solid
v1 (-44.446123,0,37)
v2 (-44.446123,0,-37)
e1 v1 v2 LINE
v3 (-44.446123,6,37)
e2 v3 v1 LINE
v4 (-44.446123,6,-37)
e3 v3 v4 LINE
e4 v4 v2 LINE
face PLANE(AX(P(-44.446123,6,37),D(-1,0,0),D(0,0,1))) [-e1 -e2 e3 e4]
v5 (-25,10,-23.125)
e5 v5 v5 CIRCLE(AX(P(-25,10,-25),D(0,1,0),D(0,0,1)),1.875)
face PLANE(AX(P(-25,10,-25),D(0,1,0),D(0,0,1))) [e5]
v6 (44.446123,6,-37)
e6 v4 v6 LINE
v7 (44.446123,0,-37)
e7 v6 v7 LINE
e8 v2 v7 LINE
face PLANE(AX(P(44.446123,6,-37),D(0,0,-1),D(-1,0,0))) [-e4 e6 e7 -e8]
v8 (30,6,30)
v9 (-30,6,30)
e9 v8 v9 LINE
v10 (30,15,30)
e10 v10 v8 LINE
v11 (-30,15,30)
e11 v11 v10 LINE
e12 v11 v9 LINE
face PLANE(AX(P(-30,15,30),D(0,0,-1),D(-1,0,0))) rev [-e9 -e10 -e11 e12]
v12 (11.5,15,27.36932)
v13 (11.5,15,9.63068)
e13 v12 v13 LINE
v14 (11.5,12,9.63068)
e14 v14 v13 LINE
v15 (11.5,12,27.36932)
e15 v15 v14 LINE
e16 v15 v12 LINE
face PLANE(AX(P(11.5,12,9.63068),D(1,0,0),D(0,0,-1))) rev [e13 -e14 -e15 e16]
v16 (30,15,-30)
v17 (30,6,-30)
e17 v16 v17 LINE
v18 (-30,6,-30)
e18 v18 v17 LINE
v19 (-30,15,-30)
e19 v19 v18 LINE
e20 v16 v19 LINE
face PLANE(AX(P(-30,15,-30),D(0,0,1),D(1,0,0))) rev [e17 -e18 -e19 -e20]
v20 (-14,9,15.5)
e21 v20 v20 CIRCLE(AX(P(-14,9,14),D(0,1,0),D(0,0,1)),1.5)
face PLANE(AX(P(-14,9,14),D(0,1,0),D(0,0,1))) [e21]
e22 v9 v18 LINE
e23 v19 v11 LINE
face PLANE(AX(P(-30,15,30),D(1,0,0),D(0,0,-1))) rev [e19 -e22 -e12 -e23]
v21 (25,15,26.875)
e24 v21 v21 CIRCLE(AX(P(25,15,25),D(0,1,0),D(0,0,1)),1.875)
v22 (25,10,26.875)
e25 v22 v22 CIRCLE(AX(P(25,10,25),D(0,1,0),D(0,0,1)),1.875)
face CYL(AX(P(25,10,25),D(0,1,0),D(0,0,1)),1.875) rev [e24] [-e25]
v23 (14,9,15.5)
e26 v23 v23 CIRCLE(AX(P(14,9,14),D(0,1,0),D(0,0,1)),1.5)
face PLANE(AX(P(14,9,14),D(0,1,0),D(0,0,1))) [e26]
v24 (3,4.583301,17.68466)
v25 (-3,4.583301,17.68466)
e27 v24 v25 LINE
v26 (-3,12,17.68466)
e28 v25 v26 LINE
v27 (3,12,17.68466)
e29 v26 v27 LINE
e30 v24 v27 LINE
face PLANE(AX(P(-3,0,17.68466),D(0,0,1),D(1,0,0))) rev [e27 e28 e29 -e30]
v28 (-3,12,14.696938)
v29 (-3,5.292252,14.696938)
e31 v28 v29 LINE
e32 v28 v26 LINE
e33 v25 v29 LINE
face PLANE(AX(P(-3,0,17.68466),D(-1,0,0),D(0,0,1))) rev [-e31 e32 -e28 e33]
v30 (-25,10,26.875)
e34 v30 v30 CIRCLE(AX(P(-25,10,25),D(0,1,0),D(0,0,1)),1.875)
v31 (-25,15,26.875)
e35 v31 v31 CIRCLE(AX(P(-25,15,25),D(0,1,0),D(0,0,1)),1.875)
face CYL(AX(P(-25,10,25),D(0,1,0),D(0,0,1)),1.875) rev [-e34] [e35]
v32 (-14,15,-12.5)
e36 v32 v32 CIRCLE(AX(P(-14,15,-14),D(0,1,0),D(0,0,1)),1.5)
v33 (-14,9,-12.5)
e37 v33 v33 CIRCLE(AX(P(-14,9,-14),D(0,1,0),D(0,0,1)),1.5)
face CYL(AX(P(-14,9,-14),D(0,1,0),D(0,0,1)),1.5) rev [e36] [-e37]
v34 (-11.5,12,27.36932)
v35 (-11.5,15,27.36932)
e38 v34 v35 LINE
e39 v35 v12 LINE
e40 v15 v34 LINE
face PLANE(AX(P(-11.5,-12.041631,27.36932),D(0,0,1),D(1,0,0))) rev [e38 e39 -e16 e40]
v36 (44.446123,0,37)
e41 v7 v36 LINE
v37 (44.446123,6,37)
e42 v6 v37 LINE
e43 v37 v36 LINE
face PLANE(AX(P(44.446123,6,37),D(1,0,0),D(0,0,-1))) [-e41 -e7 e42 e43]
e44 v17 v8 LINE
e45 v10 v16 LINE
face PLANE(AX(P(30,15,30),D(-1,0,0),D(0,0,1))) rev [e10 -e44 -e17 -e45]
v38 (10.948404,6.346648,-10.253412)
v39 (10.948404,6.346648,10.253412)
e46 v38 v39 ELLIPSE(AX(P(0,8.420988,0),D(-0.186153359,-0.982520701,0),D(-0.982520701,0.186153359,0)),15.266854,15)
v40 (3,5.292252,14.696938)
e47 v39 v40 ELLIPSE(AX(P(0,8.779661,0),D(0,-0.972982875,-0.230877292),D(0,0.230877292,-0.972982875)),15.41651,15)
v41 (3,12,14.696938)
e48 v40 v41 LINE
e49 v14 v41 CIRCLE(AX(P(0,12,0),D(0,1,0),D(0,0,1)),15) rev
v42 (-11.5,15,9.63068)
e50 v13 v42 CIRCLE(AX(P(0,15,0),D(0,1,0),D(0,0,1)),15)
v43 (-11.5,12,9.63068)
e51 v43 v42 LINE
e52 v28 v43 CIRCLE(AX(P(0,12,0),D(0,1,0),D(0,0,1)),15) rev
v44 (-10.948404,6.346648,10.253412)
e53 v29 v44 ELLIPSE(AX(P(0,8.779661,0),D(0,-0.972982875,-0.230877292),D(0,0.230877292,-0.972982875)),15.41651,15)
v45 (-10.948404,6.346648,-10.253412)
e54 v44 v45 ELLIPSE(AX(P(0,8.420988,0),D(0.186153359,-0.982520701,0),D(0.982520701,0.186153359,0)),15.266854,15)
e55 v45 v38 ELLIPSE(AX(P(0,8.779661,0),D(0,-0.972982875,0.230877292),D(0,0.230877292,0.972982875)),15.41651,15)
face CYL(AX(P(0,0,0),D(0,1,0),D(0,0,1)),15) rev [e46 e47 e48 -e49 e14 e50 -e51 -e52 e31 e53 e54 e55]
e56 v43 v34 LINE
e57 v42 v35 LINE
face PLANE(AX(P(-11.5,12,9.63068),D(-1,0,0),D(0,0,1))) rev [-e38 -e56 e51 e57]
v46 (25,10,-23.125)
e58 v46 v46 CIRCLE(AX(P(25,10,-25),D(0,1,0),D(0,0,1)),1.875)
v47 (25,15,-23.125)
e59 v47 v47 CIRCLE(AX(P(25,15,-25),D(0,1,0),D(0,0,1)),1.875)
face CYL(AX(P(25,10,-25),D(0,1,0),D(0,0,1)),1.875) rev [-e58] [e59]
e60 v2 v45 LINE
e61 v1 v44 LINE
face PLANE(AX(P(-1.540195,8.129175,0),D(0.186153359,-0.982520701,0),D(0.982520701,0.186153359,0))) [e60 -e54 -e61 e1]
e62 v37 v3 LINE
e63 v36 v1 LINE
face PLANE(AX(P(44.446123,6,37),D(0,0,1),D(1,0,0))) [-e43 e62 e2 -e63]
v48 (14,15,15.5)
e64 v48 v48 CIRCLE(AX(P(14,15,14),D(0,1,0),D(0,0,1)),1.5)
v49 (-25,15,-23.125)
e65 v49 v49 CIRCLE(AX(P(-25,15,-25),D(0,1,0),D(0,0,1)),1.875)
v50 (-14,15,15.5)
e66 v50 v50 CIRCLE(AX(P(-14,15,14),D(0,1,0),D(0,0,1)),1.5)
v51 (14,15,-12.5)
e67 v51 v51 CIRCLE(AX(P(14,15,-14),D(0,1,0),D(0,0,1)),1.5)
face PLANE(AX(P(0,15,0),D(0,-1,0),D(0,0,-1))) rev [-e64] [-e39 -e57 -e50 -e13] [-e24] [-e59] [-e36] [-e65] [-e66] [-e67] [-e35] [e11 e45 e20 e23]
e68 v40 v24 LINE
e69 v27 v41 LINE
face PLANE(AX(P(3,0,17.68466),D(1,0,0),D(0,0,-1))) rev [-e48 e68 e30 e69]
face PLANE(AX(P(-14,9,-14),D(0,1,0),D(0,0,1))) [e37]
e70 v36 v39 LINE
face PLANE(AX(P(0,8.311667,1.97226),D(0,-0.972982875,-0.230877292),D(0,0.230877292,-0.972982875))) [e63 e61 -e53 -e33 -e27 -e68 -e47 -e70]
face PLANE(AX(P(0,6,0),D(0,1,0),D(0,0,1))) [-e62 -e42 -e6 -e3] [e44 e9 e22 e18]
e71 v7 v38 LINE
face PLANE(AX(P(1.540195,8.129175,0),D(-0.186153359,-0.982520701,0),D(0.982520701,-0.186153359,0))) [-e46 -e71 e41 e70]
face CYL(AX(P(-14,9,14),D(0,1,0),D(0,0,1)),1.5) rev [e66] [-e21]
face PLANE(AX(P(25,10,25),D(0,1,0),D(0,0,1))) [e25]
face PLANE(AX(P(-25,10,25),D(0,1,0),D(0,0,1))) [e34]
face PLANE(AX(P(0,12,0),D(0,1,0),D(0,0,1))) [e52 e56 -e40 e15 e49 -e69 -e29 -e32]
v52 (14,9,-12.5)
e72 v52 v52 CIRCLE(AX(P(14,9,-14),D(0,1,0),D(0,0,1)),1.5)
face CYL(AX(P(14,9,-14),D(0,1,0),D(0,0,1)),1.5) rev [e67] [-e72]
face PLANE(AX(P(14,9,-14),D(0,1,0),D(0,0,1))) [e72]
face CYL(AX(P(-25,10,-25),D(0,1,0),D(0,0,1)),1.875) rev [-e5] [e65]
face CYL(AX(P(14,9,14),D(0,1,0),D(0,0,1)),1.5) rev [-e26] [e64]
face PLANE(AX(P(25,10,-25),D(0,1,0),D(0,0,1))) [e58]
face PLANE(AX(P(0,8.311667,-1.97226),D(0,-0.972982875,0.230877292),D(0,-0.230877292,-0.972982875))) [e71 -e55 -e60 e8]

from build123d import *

# Parameters (mm, degrees)
SKETCH1_W           = 60
SKETCH1_H           = 60
BOSS_EXTRUDE1_DEPTH = 15
SKETCH10_W          = 15
SKETCH10_H          = 15
CUT_EXTRUDE4_DEPTH  = 8
SKETCH9_W           = 88.892246252
SKETCH9_H           = 74
SKETCH9_W_2         = 60
SKETCH9_H_2         = 60
BOSS_EXTRUDE4_DEPTH = 6
SKETCH2_R           = 15
CUT_EXTRUDE5_DEPTH  = 60.744940206
SKETCH11_R          = 1.5
CUT_EXTRUDE6_DEPTH  = 6
SKETCH12_W          = 23
SKETCH12_H          = 10.738639716
CUT_EXTRUDE7_DEPTH  = 3
SKETCH13_W          = 23
SKETCH13_H          = 7
CUT_EXTRUDE8_DEPTH  = 3
SKETCH14_R          = 1.875
CUT_EXTRUDE9_DEPTH  = 5
SKETCH15_W          = 6
SKETCH15_H          = 8
CUT_EXTRUDE10_DEPTH = 60.063168554


with BuildPart() as part:
    # Sketch1 → Boss-Extrude1 (new body)
    with BuildSketch(Plane(origin=(0, 0, 0), x_dir=(1, 0, 0), z_dir=(0, 1, 0))):
        Rectangle(SKETCH1_W, SKETCH1_H)
    extrude(amount=BOSS_EXTRUDE1_DEPTH)

    # Sketch10 → Cut-Extrude4 (cut)
    with BuildSketch(Plane(origin=(0, 15, 0), x_dir=(1, 0, 0), z_dir=(0, 1, 0))):
        Rectangle(SKETCH10_W, SKETCH10_H)
    extrude(amount=-CUT_EXTRUDE4_DEPTH, mode=Mode.SUBTRACT)

    # Sketch9 → Boss-Extrude4 (add)
    with BuildSketch(Plane.XZ):
        Rectangle(SKETCH9_W, SKETCH9_H)
        Rectangle(SKETCH9_W_2, SKETCH9_H_2, mode=Mode.SUBTRACT)
    extrude(amount=-BOSS_EXTRUDE4_DEPTH)

    # Cut-Loft2: read off the stored shape, not the designer's step
    # Cut-Loft2: loft between two sections, ruled curve by curve
    cut_loft2_from = [
        Edge.make_line((-7.5, 7, -7.5), (7.5, 7, -7.5)),
        Edge.make_line((7.5, 7, -7.5), (7.5, 7, 7.5)),
        Edge.make_line((-7.5, 7, 7.5), (-7.5, 7, -7.5)),
        Edge.make_line((7.5, 7, 7.5), (-7.5, 7, 7.5)),
    ]
    cut_loft2_to = [
        Edge.make_line((-44.446123126, 0, -37), (44.446123126, 0, -37)),
        Edge.make_line((44.446123126, 0, -37), (44.446123126, 0, 37)),
        Edge.make_line((-44.446123126, 0, 37), (-44.446123126, 0, -37)),
        Edge.make_line((44.446123126, 0, 37), (-44.446123126, 0, 37)),
    ]
    cut_loft2 = Solid(Shell([*[Face.make_surface_from_curves(cut_loft2_from[k], cut_loft2_to[k]) for k in range(4)], Face(Wire(cut_loft2_from)), Face(Wire(cut_loft2_to))]))
    add(cut_loft2, mode=Mode.SUBTRACT)

    # Sketch2 → Cut-Extrude5 (cut, through all)
    with BuildSketch(Plane(origin=(0, 15, 0), x_dir=(1, 0, 0), z_dir=(0, 1, 0))):
        with Locations(Location((0, 0, 0), (0, 0, 270))):
            Circle(SKETCH2_R)
    extrude(amount=-CUT_EXTRUDE5_DEPTH, mode=Mode.SUBTRACT)

    # Sketch11 → Cut-Extrude6 (cut)
    with BuildSketch(Plane(origin=(0, 15, 0), x_dir=(1, 0, 0), z_dir=(0, 1, 0))):
        with Locations(Location((-14, 14, 0), (0, 0, 270))):
            Circle(SKETCH11_R)
        with Locations(Location((14, 14, 0), (0, 0, 270))):
            Circle(SKETCH11_R)
        with Locations(Location((14, -14, 0), (0, 0, 270))):
            Circle(SKETCH11_R)
        with Locations(Location((-14, -14, 0), (0, 0, 270))):
            Circle(SKETCH11_R)
    extrude(amount=-CUT_EXTRUDE6_DEPTH, mode=Mode.SUBTRACT)

    # Sketch12 → Cut-Extrude7 (cut)
    with BuildSketch(Plane(origin=(0, 15, 0), x_dir=(1, 0, 0), z_dir=(0, 1, 0))):
        with Locations((0, -15)):
            Rectangle(SKETCH12_W, SKETCH12_H)
    extrude(amount=-CUT_EXTRUDE7_DEPTH, mode=Mode.SUBTRACT)

    # Sketch13 → Cut-Extrude8 (cut)
    with BuildSketch(Plane(origin=(0, 15, 0), x_dir=(1, 0, 0), z_dir=(0, 1, 0))):
        with Locations((0, -23.869319858)):
            Rectangle(SKETCH13_W, SKETCH13_H)
    extrude(amount=-CUT_EXTRUDE8_DEPTH, mode=Mode.SUBTRACT)

    # Sketch14 → Cut-Extrude9 (cut)
    with BuildSketch(Plane(origin=(0, 15, 0), x_dir=(1, 0, 0), z_dir=(0, 1, 0))):
        with Locations(Location((-25, 25, 0), (0, 0, 270))):
            Circle(SKETCH14_R)
        with Locations(Location((25, 25, 0), (0, 0, 270))):
            Circle(SKETCH14_R)
        with Locations(Location((25, -25, 0), (0, 0, 270))):
            Circle(SKETCH14_R)
        with Locations(Location((-25, -25, 0), (0, 0, 270))):
            Circle(SKETCH14_R)
    extrude(amount=-CUT_EXTRUDE9_DEPTH, mode=Mode.SUBTRACT)

    # Sketch15 → Cut-Extrude10 (cut, through all)
    with BuildSketch(Plane(origin=(0, 12, 0), x_dir=(1, 0, 0), z_dir=(0, 1, 0))):
        with Locations((0, -13.684659929)):
            Rectangle(SKETCH15_W, SKETCH15_H)
    extrude(amount=-CUT_EXTRUDE10_DEPTH, mode=Mode.SUBTRACT)


solid = part.part
